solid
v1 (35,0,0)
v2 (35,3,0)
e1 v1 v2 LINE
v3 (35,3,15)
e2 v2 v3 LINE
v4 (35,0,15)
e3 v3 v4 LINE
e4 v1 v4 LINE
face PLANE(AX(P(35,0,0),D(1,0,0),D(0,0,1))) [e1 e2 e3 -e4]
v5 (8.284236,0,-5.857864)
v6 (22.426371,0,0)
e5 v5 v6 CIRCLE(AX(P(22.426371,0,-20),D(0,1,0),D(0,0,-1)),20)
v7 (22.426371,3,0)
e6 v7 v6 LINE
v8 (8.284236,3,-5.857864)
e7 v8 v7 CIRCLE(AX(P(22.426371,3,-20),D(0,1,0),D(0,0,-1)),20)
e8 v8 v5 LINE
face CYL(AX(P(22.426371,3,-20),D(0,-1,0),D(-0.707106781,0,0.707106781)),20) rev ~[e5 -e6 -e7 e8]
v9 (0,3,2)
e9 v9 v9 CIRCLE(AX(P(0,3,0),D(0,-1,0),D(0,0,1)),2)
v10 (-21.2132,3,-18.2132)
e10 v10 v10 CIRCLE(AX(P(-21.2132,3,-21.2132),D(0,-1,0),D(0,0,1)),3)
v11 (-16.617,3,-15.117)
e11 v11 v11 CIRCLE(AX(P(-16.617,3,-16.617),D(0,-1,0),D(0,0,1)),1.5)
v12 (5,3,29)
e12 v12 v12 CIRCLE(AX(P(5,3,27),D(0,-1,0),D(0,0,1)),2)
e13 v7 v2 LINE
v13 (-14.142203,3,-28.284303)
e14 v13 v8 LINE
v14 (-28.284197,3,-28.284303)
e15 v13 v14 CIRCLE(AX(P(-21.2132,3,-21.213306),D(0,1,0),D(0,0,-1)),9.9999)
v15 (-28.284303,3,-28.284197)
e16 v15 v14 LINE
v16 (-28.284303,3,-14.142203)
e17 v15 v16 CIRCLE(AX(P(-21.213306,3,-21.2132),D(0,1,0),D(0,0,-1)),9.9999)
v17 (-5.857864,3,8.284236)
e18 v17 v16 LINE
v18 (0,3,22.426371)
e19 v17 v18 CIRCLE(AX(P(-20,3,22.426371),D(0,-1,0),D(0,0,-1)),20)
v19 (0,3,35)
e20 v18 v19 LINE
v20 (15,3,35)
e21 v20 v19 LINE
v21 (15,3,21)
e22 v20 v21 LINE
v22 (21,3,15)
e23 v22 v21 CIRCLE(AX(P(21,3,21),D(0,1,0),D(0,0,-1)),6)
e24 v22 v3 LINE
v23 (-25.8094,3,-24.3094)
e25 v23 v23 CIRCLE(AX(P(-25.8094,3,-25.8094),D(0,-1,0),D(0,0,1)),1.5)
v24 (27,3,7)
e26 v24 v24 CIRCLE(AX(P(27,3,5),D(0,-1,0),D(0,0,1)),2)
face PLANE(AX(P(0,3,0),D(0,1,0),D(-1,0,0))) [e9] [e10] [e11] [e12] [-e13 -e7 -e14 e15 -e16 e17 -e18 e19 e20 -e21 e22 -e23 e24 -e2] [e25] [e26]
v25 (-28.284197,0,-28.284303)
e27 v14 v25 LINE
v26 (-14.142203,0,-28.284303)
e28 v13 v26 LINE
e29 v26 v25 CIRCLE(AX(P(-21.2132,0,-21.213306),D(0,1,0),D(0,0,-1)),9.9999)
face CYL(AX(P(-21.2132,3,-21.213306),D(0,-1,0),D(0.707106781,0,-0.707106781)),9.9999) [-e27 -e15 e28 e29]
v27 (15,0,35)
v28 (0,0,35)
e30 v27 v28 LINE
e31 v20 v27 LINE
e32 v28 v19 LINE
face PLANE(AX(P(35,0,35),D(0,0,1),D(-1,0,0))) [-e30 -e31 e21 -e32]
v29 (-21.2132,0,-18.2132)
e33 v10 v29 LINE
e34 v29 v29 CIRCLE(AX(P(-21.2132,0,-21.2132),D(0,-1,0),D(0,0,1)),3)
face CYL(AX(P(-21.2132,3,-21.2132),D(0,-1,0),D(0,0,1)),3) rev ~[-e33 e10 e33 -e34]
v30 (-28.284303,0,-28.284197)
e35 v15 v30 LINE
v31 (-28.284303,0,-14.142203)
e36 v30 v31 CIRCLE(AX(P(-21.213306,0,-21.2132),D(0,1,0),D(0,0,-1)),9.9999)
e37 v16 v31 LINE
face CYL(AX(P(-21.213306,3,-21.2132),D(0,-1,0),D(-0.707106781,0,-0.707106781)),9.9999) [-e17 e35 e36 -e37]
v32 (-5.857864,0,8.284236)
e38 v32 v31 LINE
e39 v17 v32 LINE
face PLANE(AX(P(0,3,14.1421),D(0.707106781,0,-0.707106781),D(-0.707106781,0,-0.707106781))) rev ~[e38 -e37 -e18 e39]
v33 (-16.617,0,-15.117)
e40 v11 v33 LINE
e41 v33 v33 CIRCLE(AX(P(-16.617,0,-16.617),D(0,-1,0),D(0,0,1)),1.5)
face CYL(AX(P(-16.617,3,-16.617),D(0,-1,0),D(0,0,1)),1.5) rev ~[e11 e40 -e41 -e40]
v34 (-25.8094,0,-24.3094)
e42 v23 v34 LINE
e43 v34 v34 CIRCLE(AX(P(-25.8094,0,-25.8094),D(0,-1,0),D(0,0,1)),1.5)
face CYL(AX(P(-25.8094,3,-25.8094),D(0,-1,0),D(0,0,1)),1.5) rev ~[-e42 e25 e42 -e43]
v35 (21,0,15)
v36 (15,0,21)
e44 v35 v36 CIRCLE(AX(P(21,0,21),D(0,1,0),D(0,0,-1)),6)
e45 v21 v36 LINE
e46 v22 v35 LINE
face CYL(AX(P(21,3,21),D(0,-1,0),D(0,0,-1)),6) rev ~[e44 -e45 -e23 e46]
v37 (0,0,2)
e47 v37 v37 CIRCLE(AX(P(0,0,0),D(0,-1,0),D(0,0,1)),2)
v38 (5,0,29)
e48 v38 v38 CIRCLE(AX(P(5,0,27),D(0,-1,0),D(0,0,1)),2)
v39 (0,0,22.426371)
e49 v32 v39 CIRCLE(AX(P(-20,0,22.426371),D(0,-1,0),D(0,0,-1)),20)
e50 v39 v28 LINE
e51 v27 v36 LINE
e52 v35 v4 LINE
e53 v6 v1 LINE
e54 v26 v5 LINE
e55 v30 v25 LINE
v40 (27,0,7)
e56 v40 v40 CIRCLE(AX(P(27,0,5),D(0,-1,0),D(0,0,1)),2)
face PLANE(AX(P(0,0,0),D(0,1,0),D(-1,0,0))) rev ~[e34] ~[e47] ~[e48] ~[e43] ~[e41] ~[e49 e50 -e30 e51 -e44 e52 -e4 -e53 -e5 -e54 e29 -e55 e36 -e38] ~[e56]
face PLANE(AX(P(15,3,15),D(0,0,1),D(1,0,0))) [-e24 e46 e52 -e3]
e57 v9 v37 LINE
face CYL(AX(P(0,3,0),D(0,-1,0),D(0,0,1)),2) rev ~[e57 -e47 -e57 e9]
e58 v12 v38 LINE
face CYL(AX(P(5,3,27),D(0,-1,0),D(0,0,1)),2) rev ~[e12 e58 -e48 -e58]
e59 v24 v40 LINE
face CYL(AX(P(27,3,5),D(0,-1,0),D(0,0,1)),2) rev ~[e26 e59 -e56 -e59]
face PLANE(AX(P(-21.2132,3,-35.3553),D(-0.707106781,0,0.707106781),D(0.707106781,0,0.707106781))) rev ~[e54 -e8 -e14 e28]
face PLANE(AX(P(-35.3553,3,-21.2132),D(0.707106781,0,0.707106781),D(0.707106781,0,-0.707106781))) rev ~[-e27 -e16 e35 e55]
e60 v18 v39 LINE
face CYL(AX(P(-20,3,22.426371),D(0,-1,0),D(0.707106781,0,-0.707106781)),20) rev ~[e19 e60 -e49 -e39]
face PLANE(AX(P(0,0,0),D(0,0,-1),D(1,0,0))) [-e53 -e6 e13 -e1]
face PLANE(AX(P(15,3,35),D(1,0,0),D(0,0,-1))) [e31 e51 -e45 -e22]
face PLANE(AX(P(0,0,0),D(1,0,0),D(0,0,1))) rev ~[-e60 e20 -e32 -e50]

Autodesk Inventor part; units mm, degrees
ref_plane "YZ Plane" through (0, 0, 0) normal (1, 0, 0) x (0, 1, 0)
ref_plane "XZ Plane" through (0, 0, 0) normal (0, 1, 0) x (-1, 0, 0)
ref_plane "XY Plane" through (0, 0, 0) normal (0, 0, 1) x (1, 0, 0)
sketch "Sketch23" plane through (0, 0, 0) normal (0, 1, 0) x (-1, 0, 0)
  line L0 (0, -7) -> (0, 42) projected
  line L1 (7, 0) -> (-42, 0) projected
  line L2 (0, 0) -> (-35, 0)
  line L3 (-35, 0) -> (-35, 35)
  line L4 (-35, 35) -> (0, 35)
  line L5 (0, 35) -> (0, 0)
  line L6 (0, 0) -> (-35, 35) construction
  point P0 (0, 0)
  dimension "d213" = 35
  dimension "d214" = 35
extrude "Extrusion14" add sketch "Sketch23" along normal blind 3
sketch "Sketch24" plane through (0, 3, 0) normal (0, 1, 0) x (1, 0, 0)
  line L0 (35, 0) -> (0, 0) projected
  line L1 (0, 0) -> (0, -35) projected
  line L2 (0, -35) -> (35, -35) projected
  line L3 (35, -35) -> (35, 0) projected
  line L4 (-41.7276, 41.7276) -> (35, -35) construction
  line L5 (-35.3553, 21.2132) -> (-21.2132, 35.3553)
  line L6 (-21.2132, 35.3553) -> (14.1421, 0)
  line L7 (35, 0) -> (0, 0) projected
  line L8 (0, -14.1421) -> (-35.3553, 21.2132)
  line L9 (-23.915, -23.915) -> (42.6519, 42.6519) construction
  dimension "d217" = 45
  dimension "d218" = 20
  dimension "d219" = 40
extrude "Extrusion15" add sketch "Sketch24" against normal blind 3 contours L0 L1 L8 L5 L6
sketch "Sketch36" plane through (0, 3, 0) normal (0, 1, 0) x (1, 0, 0)
  line L0 (-35.3553, 21.2132) -> (0, -14.1421) projected
  line L1 (14.1421, 0) -> (-21.2132, 35.3553) projected
  line L2 (-21.2132, 35.3553) -> (-35.3553, 21.2132) projected
  line L3 (-24.0416, 32.5269) -> (-32.5269, 24.0416) projected
  line L4 (20, -20) -> (32, -20) projected
  line L5 (-18.4468, 18.4468) -> (20, -20) construction
  line L6 (-49.4264, 0) -> (49.0711, 0) projected
  line L7 (0, 49.4264) -> (0, -49.0711) projected
  line L8 (35, 0) -> (14.1421, 0) projected
  line L9 (0, -14.1421) -> (0, -35) projected
  line L10 (35, -35) -> (35, 0) projected
  line L11 (0, -35) -> (35, -35) projected
  point P0 (0, 0)
  point P1 (-18.3848, 9.8995)
  point P2 (0, -32)
  point P3 (32, 0)
  point P4 (-9.8995, 18.3848)
  point P5 (-21.2132, 21.2132)
  dimension "d311" = 45
  dimension "d312" = 10
hole "Hole17" at (-21.2132, 3, -21.2132) direction (0, -1, 0) diameter 6 end through all
sketch "Sketch37" plane through (0, 3, 0) normal (0, 1, 0) x (1, 0, 0)
  circle A0 centre (-21.2132, 21.2132) radius 3 projected
  line L0 (14.1421, 0) -> (-21.2132, 35.3553) projected
  line L1 (-21.2132, 35.3553) -> (-35.3553, 21.2132) projected
  line L2 (-35.3553, 21.2132) -> (0, -14.1421) projected
  line L3 (-34.5369, 34.5369) -> (-7.0609, 7.0609) construction
  line L4 (-38.7653, 3.6611) -> (1.6595, 44.0859) construction
  line L5 (-53.5184, 0) -> (49.7531, 0) projected
  line L6 (0, 59.903) -> (0, -50.8172) projected
  line L7 (35, 0) -> (14.1421, 0) projected
  line L8 (0, -14.1421) -> (0, -35) projected
  line L9 (35, -35) -> (35, 0) projected
  line L10 (0, -35) -> (35, -35) projected
  point P0 (0, 0)
  point P1 (32, 0)
  point P2 (0, -32)
  point P3 (-25.8094, 25.8094)
  point P4 (-16.617, 16.617)
  dimension "d321" = 45
  dimension "d322" = 45
  dimension "d323" = 6.5
  dimension "d324" = 6.5
hole "Hole18" at (-25.8094, 3, -25.8094) at (-16.617, 3, -16.617) direction (0, -1, 0) diameter 3 end through all
fillet "Fillet15" radius 10 2 edges at (-35.3553, 1.5, -21.2132) (-21.2132, 1.5, -35.3553)
fillet "Fillet18" radius 20 2 edges at (14.1421, 1.5, 0) (0, 1.5, 14.1421)
sketch "Sketch39" plane through (0, 3, 0) normal (0, 1, 0) x (1, 0, 0)
  circle A0 centre (-21.2132, 21.2132) radius 3 projected
  circle A1 centre (-16.617, 16.617) radius 1.5 projected
  circle A2 centre (-25.8094, 25.8094) radius 1.5 projected
  arc A3 (-14.1421, 28.2843) -> (-28.2843, 14.1421) centre (-21.2132, 21.2132) ccw projected
  line L0 (-28.2843, 14.1421) -> (-5.8579, -8.2843) projected
  arc A4 (0, -22.4264) -> (-5.8579, -8.2843) centre (-20, -22.4264) ccw projected
  line L1 (0, -22.4264) -> (0, -35) projected
  line L2 (35, 0) -> (22.4264, 0) projected
  arc A5 (8.2843, 5.8579) -> (22.4264, 0) centre (22.4264, 20) ccw projected
  line L3 (8.2843, 5.8579) -> (-14.1421, 28.2843) projected
  line L4 (26.8786, -26.8786) -> (-35.1686, 35.1686) construction
  line L5 (-58.6564, 0) -> (50.6094, 0) projected
  line L6 (0, 49.4264) -> (0, -49.0711) projected
  line L7 (-9.3628, 33.0636) -> (-43.047, -0.6206) construction
  line L8 (0, -35) -> (35, -35) projected
  line L9 (35, -35) -> (35, 0) projected
  point P0 (0, 0)
  point P1 (0, -32)
  point P2 (32, 0)
  point P3 (0, 0)
  dimension "d339" = 45
  dimension "d340" = 30
hole "Hole19" at (0, 3, 0) direction (0, -1, 0) diameter 4 end through all
sketch "Sketch40" plane through (0, 3, 0) normal (0, 1, 0) x (1, 0, 0)
  circle A0 centre (0, 0) radius 2 projected
  circle A1 centre (-25.8094, 25.8094) radius 1.5 projected
  circle A2 centre (-16.617, 16.617) radius 1.5 projected
  circle A3 centre (-21.2132, 21.2132) radius 3 projected
  arc A4 (-14.1421, 28.2843) -> (-28.2843, 14.1421) centre (-21.2132, 21.2132) ccw projected
  line L0 (-28.2843, 14.1421) -> (-5.8579, -8.2843) projected
  arc A5 (0, -22.4264) -> (-5.8579, -8.2843) centre (-20, -22.4264) ccw projected
  line L1 (0, -22.4264) -> (0, -35) projected
  line L2 (0, -35) -> (35, -35) projected
  line L3 (35, -35) -> (35, 0) projected
  line L4 (35, 0) -> (22.4264, 0) projected
  arc A6 (8.2843, 5.8579) -> (22.4264, 0) centre (22.4264, 20) ccw projected
  line L5 (8.2843, 5.8579) -> (-14.1421, 28.2843) projected
  line L6 (35, -35) -> (15, -35)
  line L7 (15, -35) -> (15, -15)
  line L8 (15, -15) -> (35, -15)
  line L9 (35, -15) -> (35, -35)
  line L10 (0, -35) -> (35, -35) projected
  line L11 (35, -35) -> (35, 0) projected
  point P0 (0, 0)
  dimension "d394" = 15
  dimension "d395" = 15
extrude "Extrusion19" cut sketch "Sketch40" against normal blind 10 contours L3 L2 L7 L8
fillet "Fillet19" radius 6 1 edges at (15, 1.5, 15)
sketch "Sketch44" plane through (0, 3, 0) normal (0, 1, 0) x (1, 0, 0)
  line L0 (15, -35) -> (15, -21) projected
  arc A0 (21, -15) -> (15, -21) centre (21, -21) ccw projected
  line L1 (21, -15) -> (35, -15) projected
  line L2 (35, 0) -> (22.4264, 0) projected
  arc A1 (8.2843, 5.8579) -> (22.4264, 0) centre (22.4264, 20) ccw projected
  line L3 (8.2843, 5.8579) -> (-14.1421, 28.2843) projected
  arc A2 (-14.1421, 28.2843) -> (-28.2843, 14.1421) centre (-21.2132, 21.2132) ccw projected
  line L4 (-28.2843, 14.1421) -> (-5.8579, -8.2843) projected
  arc A3 (0, -22.4264) -> (-5.8579, -8.2843) centre (-20, -22.4264) ccw projected
  line L5 (0, -22.4264) -> (0, -35) projected
  circle A4 centre (-21.2132, 21.2132) radius 3 projected
  circle A5 centre (-16.617, 16.617) radius 1.5 projected
  circle A6 centre (-25.8094, 25.8094) radius 1.5 projected
  circle A7 centre (0, 0) radius 2 projected
  line L6 (35, -15) -> (35, 0) projected
  line L7 (0, -35) -> (15, -35) projected
  point P0 (0, 0)
  point P1 (27, -5)
  point P2 (5, -27)
  dimension "d383" = 5
  dimension "d385" = 5
hole "Hole22" at (27, 3, 5) at (5, 3, 27) direction (0, -1, 0) diameter 4 end through all
properties part number "quarter_upper"
